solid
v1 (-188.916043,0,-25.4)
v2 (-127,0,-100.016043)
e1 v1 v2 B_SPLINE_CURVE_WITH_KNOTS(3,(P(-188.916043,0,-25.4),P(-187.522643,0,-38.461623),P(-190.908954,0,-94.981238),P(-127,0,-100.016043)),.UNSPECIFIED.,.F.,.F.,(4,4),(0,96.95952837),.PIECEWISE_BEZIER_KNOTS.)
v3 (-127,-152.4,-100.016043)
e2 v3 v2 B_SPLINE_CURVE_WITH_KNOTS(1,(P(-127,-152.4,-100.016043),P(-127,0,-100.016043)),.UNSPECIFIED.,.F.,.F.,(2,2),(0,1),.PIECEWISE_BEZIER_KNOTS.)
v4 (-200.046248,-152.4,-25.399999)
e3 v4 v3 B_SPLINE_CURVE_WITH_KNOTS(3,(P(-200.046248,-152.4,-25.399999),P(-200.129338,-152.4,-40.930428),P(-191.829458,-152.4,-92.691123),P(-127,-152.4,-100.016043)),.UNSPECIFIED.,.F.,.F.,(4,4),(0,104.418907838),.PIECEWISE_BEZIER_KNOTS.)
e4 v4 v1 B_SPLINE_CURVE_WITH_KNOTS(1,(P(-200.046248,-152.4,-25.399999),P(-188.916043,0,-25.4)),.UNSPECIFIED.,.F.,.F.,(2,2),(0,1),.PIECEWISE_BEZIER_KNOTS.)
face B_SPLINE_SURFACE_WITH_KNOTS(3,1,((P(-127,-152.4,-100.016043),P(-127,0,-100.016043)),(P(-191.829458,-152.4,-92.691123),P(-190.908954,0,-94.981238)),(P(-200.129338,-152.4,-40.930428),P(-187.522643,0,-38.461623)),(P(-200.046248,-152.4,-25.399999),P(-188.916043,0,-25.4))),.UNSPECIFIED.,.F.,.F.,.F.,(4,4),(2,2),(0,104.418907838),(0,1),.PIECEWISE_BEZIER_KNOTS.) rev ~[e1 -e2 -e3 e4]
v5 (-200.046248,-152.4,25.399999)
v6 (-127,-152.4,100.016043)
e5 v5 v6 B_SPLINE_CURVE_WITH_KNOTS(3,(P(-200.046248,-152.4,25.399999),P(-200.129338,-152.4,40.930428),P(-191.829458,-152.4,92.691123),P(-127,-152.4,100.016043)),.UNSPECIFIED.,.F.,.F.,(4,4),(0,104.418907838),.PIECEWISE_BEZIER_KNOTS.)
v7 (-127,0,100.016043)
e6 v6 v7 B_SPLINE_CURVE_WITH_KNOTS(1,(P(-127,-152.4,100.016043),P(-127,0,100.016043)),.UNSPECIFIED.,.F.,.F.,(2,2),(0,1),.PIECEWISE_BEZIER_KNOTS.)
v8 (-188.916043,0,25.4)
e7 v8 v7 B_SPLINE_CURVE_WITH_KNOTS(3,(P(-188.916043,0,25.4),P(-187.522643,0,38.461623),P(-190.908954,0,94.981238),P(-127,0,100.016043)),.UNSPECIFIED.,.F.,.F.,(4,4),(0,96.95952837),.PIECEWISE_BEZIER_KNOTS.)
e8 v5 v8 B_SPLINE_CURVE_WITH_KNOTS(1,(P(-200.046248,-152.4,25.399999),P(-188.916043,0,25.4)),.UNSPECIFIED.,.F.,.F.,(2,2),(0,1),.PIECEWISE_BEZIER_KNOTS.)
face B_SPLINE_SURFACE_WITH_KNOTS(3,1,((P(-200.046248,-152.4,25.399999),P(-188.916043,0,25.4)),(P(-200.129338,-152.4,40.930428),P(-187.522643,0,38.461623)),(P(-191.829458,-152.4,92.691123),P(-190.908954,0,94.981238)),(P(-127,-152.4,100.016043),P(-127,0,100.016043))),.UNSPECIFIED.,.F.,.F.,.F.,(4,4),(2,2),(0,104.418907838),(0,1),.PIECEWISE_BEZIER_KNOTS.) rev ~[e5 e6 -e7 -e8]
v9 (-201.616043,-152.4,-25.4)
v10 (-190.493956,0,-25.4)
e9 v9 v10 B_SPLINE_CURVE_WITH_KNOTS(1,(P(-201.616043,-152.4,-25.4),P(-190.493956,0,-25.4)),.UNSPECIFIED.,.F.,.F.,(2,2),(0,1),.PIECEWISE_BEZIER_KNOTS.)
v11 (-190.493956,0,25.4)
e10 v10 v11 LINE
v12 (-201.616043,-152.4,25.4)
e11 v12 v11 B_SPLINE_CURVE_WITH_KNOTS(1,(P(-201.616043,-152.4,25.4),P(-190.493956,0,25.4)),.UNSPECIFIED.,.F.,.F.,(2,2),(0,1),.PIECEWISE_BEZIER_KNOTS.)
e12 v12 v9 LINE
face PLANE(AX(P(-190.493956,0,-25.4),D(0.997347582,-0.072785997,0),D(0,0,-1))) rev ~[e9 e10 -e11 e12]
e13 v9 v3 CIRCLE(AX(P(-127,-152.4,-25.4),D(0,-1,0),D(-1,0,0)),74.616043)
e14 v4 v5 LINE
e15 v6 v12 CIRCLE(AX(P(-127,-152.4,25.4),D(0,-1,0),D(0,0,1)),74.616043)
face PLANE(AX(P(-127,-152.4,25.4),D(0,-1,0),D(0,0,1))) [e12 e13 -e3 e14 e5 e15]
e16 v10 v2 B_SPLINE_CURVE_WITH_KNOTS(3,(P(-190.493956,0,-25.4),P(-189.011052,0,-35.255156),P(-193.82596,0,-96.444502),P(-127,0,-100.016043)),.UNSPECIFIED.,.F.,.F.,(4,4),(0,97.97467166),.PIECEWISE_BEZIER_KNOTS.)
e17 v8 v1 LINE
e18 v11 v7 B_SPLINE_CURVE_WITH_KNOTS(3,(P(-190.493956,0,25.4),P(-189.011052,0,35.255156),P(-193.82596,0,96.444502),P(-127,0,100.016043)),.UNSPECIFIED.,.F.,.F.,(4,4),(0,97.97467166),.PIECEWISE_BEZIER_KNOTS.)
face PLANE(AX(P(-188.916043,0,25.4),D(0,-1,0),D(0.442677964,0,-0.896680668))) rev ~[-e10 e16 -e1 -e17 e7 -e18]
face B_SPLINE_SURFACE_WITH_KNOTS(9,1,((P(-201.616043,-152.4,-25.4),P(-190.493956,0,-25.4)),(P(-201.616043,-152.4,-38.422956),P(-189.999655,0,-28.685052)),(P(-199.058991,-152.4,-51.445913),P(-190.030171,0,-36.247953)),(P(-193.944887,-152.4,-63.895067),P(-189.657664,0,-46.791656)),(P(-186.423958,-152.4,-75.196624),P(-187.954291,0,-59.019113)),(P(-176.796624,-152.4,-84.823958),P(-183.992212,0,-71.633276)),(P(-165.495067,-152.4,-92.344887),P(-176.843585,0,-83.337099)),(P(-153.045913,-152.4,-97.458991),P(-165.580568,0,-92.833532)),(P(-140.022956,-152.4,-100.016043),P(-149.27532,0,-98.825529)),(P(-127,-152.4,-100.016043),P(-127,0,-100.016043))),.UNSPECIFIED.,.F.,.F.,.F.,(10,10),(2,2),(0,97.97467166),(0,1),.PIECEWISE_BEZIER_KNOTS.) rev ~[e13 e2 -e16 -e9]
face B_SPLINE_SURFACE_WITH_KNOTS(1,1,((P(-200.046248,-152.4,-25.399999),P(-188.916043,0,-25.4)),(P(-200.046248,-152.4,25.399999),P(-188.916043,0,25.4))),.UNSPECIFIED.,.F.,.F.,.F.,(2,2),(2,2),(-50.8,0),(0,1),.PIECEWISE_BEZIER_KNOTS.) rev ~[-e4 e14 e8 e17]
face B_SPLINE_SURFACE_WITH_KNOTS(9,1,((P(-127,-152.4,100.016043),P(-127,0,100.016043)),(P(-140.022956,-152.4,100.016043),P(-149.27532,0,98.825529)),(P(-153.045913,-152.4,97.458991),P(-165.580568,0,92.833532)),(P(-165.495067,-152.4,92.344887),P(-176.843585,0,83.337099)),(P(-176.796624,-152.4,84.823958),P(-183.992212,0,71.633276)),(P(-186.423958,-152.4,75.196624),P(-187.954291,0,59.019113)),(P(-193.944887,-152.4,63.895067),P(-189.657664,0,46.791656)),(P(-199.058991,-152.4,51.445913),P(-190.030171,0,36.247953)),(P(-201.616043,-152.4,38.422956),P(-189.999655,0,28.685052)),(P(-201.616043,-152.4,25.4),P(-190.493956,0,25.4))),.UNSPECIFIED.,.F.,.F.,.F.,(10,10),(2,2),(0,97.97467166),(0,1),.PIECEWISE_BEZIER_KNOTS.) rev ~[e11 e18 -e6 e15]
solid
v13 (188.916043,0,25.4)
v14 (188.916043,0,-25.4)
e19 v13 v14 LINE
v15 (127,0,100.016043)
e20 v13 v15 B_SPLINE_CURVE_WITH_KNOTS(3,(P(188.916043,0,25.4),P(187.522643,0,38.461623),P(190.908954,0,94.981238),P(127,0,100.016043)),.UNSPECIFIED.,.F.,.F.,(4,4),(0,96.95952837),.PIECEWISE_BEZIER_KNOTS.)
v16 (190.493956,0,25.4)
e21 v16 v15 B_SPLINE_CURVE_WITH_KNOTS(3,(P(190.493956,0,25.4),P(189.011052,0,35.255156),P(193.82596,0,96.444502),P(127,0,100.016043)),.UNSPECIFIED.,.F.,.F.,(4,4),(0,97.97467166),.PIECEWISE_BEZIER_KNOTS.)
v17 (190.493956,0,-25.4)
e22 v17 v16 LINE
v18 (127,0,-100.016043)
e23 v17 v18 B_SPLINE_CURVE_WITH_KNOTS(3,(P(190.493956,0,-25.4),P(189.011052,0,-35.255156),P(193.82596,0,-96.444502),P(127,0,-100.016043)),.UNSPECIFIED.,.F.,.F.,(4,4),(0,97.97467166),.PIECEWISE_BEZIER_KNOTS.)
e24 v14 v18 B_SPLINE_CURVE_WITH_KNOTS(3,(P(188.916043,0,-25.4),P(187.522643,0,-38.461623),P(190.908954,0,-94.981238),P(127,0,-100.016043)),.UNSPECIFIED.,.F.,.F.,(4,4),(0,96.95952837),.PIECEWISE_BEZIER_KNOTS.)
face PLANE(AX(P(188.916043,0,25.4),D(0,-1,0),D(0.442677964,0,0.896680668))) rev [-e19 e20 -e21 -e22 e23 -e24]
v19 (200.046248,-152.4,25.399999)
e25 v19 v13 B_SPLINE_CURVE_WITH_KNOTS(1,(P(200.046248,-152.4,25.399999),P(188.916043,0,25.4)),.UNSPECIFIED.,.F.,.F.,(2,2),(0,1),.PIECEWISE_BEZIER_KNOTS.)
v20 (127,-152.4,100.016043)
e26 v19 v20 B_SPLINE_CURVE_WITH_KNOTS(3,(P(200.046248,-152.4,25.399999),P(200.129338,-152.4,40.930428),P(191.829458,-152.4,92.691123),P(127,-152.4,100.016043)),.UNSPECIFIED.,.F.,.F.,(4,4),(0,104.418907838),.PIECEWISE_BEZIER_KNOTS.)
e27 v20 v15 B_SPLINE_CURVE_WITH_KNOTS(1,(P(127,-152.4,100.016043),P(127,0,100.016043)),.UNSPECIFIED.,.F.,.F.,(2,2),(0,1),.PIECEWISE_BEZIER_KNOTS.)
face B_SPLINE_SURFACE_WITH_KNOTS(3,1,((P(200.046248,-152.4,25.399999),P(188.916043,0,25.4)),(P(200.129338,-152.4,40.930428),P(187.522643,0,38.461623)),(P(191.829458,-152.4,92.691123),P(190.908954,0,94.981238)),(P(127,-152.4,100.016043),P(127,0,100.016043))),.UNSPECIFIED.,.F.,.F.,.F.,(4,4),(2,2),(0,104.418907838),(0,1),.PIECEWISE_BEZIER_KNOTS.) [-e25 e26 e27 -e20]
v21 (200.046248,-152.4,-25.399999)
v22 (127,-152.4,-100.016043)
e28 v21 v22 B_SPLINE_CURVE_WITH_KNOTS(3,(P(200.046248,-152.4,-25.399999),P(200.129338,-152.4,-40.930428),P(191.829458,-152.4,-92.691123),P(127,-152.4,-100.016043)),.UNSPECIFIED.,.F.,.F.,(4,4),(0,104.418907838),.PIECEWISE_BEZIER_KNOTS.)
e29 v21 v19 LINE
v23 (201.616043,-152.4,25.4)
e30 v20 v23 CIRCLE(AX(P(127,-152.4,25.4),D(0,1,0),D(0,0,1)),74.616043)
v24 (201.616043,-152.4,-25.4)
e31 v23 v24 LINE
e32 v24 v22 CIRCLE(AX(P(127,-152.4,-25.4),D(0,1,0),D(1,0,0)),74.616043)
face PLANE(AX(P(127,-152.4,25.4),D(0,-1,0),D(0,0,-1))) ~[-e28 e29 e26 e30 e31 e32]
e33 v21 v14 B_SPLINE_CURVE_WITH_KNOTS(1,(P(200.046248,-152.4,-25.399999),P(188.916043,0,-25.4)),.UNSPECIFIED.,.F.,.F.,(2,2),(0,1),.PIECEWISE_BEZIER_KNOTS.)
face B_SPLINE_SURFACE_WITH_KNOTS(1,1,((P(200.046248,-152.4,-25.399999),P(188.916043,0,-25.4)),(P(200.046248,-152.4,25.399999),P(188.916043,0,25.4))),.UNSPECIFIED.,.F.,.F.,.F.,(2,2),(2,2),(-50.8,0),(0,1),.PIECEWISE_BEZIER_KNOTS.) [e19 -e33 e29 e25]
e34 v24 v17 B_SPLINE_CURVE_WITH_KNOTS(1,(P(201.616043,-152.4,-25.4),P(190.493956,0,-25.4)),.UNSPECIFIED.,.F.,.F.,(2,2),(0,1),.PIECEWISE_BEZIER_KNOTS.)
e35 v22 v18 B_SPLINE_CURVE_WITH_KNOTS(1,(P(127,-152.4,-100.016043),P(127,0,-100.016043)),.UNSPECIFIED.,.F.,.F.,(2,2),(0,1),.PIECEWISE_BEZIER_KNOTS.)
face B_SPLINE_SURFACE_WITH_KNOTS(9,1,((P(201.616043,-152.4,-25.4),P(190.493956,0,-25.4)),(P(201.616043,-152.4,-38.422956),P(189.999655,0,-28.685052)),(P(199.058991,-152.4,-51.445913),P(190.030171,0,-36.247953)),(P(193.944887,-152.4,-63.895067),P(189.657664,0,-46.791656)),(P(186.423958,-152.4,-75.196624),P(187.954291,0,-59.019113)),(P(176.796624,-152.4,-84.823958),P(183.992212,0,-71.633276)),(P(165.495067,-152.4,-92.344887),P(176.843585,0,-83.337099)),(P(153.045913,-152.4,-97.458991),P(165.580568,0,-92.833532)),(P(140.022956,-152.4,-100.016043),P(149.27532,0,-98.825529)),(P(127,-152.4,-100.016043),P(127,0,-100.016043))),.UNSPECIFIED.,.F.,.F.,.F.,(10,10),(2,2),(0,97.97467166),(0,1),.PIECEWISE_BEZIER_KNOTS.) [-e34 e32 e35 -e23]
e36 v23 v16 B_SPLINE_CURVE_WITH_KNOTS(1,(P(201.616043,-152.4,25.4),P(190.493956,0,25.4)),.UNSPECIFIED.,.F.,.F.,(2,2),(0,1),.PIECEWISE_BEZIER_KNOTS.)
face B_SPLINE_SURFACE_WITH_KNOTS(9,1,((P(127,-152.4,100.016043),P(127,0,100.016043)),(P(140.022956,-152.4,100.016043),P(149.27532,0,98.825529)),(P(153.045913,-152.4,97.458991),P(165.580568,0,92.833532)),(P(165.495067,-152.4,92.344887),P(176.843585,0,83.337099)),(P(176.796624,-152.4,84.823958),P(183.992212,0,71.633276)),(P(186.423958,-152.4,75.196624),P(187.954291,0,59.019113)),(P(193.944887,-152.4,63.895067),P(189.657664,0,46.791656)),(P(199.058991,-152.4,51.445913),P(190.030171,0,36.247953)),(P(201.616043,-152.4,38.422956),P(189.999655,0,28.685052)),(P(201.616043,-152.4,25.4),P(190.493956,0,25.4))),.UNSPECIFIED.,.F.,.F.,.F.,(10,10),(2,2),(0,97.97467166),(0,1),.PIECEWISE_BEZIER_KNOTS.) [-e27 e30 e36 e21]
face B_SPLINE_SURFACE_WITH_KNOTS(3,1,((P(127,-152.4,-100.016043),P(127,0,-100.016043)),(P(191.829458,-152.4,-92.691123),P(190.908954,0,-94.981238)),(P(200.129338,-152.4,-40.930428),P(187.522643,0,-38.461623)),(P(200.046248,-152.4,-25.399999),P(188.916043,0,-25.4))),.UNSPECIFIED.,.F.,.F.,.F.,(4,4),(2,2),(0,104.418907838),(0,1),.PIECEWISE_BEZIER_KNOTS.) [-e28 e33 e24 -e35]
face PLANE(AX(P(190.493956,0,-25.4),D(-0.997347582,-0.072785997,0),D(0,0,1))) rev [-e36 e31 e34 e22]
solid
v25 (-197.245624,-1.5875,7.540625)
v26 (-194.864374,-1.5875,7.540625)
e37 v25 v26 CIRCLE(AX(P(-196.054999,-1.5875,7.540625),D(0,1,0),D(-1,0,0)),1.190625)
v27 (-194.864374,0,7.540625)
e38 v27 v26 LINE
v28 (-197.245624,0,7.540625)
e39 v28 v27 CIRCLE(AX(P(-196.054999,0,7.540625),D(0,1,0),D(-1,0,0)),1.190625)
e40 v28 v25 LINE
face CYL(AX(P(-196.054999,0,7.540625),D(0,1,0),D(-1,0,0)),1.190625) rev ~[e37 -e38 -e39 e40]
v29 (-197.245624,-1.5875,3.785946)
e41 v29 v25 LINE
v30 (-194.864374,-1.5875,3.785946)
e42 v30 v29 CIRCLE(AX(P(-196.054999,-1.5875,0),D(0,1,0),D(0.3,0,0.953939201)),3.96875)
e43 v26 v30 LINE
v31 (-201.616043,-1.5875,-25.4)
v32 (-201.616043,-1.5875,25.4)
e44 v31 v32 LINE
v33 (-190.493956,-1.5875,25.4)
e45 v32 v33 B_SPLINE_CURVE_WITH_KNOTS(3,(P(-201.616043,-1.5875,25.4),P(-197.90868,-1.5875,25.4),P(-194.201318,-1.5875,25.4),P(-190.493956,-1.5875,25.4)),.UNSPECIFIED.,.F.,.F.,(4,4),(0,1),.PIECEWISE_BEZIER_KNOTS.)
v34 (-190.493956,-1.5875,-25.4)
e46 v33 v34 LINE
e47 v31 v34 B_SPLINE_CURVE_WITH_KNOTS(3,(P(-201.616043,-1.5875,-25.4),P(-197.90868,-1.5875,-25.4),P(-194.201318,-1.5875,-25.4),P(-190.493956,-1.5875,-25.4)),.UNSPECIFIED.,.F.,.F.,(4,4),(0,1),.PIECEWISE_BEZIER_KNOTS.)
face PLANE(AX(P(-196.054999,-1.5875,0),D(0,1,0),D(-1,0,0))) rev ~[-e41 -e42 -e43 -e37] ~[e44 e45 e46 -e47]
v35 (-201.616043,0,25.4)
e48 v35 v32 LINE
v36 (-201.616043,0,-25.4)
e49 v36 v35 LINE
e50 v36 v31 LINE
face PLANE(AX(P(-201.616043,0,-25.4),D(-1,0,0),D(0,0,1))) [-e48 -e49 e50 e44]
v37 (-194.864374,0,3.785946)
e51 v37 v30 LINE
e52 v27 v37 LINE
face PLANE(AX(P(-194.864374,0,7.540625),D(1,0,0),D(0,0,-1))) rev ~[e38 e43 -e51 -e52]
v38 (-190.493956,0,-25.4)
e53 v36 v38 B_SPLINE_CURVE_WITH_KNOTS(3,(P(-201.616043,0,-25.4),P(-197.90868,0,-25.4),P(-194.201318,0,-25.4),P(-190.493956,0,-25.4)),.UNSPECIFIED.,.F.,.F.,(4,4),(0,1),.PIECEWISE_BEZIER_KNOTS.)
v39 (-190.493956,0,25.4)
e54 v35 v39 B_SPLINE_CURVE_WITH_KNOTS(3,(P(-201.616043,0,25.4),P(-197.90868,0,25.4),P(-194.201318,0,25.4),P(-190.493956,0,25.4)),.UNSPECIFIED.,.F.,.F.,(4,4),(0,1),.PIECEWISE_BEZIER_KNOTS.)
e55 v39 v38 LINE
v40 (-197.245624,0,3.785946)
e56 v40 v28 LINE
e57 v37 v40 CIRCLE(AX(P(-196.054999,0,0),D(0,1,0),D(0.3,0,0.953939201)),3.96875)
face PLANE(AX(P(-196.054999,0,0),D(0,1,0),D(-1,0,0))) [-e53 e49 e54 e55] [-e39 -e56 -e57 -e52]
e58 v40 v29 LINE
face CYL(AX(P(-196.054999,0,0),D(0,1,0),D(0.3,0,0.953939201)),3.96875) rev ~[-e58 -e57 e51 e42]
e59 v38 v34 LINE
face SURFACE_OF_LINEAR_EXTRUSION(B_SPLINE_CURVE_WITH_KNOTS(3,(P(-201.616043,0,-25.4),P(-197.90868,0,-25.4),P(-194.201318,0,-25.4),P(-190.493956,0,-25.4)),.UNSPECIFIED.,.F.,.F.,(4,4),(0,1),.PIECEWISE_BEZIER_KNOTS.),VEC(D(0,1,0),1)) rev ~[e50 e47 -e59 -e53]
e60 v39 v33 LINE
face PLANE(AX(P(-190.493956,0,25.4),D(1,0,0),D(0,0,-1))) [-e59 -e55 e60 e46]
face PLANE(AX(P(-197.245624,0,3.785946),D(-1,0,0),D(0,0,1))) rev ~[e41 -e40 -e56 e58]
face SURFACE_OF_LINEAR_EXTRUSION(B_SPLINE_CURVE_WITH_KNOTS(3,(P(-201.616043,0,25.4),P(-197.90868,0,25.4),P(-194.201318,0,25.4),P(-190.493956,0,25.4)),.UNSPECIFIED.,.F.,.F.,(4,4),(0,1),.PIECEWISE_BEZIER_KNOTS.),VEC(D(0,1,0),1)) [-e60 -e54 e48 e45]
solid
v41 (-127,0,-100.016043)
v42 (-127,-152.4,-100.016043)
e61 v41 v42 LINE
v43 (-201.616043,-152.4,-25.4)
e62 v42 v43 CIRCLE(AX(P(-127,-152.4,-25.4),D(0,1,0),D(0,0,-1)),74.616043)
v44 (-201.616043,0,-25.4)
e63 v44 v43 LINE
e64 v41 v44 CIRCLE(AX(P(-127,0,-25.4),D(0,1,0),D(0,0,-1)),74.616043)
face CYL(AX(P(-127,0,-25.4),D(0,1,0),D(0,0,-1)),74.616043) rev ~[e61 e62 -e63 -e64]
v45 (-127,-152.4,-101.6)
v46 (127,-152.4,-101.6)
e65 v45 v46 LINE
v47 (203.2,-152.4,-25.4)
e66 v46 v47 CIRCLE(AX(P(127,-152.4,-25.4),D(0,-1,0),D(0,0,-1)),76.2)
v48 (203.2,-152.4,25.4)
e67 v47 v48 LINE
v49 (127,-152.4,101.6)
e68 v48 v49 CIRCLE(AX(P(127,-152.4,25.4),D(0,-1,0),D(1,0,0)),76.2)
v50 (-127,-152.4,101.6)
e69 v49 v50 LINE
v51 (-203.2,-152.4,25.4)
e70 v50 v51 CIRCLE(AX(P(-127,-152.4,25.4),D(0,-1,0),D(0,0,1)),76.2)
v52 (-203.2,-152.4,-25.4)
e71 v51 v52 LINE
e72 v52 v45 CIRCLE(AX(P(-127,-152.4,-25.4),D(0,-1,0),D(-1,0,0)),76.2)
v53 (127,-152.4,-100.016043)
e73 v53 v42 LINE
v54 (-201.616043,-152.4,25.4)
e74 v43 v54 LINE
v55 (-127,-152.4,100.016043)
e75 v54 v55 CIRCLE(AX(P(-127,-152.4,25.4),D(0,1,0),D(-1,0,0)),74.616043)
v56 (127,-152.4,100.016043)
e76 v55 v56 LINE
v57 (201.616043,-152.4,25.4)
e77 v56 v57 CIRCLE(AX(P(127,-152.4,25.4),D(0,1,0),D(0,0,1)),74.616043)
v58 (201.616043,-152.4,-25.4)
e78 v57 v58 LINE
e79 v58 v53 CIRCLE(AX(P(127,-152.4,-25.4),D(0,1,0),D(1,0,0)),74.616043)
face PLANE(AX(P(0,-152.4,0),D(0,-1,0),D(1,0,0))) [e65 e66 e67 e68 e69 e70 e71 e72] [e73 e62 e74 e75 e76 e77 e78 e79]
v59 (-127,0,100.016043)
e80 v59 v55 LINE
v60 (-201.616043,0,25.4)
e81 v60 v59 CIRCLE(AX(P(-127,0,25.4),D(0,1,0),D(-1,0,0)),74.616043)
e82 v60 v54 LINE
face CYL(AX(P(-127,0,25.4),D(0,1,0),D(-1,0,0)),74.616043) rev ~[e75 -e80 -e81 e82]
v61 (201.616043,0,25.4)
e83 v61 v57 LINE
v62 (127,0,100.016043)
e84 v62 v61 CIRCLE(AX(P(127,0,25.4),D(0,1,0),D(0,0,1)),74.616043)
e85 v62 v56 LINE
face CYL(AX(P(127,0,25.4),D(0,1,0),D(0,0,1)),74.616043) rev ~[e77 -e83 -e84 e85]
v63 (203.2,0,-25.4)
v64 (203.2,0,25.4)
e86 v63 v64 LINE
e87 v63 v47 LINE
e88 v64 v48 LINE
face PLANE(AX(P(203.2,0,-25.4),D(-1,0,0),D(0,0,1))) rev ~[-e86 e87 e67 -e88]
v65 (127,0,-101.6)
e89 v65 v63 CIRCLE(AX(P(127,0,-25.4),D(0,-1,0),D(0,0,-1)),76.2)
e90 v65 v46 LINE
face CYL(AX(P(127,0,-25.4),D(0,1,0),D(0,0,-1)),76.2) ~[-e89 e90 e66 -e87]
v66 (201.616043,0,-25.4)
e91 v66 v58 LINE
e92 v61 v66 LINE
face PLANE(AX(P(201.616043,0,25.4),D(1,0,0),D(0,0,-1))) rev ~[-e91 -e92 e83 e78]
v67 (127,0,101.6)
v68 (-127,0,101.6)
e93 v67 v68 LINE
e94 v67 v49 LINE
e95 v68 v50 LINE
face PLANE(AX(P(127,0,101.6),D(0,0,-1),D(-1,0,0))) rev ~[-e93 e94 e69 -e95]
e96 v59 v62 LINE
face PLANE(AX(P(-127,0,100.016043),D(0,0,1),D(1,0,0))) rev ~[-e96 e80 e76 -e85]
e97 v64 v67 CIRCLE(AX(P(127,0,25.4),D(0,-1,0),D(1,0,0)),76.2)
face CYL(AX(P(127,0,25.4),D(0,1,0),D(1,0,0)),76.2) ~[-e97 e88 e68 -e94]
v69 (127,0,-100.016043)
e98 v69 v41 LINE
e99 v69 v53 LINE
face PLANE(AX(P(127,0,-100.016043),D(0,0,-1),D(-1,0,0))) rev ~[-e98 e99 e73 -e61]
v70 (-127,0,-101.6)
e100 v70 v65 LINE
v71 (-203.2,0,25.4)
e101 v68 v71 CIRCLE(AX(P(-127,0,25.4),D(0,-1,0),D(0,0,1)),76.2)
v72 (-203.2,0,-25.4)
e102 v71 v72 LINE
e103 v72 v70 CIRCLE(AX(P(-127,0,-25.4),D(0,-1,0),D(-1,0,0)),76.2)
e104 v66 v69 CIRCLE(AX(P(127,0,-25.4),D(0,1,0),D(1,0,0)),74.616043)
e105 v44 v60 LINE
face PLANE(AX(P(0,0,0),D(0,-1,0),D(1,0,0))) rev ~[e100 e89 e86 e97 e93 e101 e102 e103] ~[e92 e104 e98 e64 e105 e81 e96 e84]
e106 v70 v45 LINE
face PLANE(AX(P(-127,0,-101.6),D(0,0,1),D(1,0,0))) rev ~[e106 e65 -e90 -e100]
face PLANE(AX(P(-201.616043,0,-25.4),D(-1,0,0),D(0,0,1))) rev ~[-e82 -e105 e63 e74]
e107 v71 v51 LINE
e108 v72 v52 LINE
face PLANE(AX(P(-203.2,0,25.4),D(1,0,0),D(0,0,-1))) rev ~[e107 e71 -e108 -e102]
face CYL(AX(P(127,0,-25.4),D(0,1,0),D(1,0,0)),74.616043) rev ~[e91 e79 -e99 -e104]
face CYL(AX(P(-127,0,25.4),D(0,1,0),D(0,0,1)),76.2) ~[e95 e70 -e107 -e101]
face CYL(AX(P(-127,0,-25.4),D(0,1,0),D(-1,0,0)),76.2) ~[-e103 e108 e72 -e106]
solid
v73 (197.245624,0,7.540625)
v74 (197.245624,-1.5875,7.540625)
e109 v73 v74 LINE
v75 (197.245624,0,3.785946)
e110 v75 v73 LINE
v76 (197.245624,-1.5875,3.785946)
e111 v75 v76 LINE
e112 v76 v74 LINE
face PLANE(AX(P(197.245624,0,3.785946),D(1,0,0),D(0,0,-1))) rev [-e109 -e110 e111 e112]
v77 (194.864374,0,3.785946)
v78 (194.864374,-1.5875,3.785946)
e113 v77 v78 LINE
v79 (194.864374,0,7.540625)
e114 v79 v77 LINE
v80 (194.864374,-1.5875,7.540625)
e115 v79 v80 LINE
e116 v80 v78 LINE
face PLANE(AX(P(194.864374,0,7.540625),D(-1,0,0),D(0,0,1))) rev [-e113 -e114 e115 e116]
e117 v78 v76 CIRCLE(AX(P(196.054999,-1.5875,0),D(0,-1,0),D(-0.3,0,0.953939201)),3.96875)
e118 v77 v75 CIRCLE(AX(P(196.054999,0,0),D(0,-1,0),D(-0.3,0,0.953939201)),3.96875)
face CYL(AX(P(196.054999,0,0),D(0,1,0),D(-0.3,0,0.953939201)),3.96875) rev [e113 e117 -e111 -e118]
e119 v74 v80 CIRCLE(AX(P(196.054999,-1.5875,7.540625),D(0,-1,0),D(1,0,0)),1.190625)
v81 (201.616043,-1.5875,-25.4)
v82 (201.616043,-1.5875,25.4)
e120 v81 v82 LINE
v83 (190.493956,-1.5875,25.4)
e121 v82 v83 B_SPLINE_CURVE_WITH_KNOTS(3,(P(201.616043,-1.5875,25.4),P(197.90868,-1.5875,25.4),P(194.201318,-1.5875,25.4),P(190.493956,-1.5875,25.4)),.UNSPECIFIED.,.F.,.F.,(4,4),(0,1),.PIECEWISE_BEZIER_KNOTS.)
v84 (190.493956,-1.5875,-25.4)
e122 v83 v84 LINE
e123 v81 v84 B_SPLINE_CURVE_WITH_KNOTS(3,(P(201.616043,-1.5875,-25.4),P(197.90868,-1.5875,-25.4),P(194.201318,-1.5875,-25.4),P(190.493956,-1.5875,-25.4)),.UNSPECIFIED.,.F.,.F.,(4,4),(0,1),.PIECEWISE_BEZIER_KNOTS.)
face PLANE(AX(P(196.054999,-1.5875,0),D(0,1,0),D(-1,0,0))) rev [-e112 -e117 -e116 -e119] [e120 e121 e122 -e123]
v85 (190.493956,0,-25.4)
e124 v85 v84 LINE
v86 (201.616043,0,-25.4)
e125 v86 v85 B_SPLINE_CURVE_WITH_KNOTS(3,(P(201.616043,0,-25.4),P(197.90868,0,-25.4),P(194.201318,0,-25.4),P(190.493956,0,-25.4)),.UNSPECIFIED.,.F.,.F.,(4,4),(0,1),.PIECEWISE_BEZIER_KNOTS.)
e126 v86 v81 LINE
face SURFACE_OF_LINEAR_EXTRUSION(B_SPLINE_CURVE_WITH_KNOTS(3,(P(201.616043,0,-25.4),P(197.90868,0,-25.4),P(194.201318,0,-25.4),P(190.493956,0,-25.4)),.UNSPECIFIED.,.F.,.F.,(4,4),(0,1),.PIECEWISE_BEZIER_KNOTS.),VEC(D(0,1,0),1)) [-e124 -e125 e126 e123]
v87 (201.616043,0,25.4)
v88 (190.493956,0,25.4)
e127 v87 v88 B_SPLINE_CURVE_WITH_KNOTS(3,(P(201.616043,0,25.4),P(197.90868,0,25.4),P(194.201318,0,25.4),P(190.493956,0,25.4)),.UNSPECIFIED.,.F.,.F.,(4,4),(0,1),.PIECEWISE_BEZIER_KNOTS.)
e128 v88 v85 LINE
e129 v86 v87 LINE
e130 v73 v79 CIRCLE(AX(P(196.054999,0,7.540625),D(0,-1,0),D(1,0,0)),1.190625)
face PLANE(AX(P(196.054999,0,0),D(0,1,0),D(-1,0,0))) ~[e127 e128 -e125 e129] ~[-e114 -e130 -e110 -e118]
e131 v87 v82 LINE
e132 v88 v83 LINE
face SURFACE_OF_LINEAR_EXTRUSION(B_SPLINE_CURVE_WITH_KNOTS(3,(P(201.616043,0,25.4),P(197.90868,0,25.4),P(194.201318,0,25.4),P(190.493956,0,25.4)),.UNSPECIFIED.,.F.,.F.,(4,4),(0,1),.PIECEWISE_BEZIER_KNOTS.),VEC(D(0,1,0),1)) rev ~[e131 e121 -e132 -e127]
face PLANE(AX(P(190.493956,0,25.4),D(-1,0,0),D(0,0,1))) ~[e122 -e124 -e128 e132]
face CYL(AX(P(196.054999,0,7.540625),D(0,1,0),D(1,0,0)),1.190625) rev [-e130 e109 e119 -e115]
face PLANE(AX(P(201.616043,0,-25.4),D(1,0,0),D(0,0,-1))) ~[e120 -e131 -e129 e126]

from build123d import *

# Parameters (mm, degrees)
F1_DEPTH = 152.4
F7_DEPTH = 1.5875
F9_DEPTH = 1.6002


# Not quite as in the source:
# - ends of sketch curves that miss each other by under 0.0002 mm in the source are joined


with BuildPart() as f1:
    # F0 (on Front) → F1 (new body)
    with BuildSketch(Plane.XZ):
        with BuildLine():
            Line((-127, -101.6), (127, -101.6))
            ThreePointArc((127, -101.6), (180.8815367264, -79.2815367264), (203.2, -25.4))
            Line((203.2, -25.4), (203.2, 25.4))
            ThreePointArc((203.2, 25.4), (180.8815367264, 79.2815367264), (127, 101.6))
            Line((127, 101.6), (-127, 101.6))
            ThreePointArc((-127, 101.6), (-180.8815367264, 79.2815367264), (-203.2, 25.4))
            Line((-203.2, 25.4), (-203.2, -25.4))
            ThreePointArc((-203.2, -25.4), (-180.8815367264, -79.2815367264), (-127, -101.6))
        make_face()
        with BuildLine():
            ThreePointArc((127, 100.0160425901), (179.7615097008, 78.1615097008), (201.6160425901, 25.4))
            Line((201.6160425901, 25.4), (201.6160425901, -25.4))
            ThreePointArc((201.6160425901, -25.4), (179.7615097008, -78.1615097008), (127, -100.0160425901))
            Line((127, -100.0160425901), (-127, -100.0160425901))
            ThreePointArc((-127, -100.0160425901), (-179.7615097008, -78.1615097008), (-201.6160425901, -25.4))
            Line((-201.6160425901, -25.4), (-201.6160425901, 25.4))
            ThreePointArc((-201.6160425901, 25.4), (-179.7615097008, 78.1615097008), (-127, 100.0160425901))
            Line((-127, 100.0160425901), (127, 100.0160425901))
        make_face(mode=Mode.SUBTRACT)
    extrude(amount=F1_DEPTH)


with BuildPart() as f4:
    # F2 (on face) → F4 section 0
    with BuildSketch(Plane.XZ.offset(152.4)):
        with BuildLine():
            add(Edge.make_bspline(
                [(-200.0462481144, 25.3999990709), (-200.1293383282, 40.9304278155), (-191.8294578791, 92.6911234856), (-127, 100.0160425901)],
                knots=[0, 0, 0, 0, 104.4189078379, 104.4189078379, 104.4189078379, 104.4189078379], degree=3))
            ThreePointArc((-127, 100.0160425901), (-179.7615097008, 78.1615097008), (-201.6160425901, 25.4))
            Line((-201.6160425901, 25.4), (-201.6160425901, -25.4))
            ThreePointArc((-201.6160425901, -25.4), (-179.7615097008, -78.1615097008), (-127, -100.0160425901))
            add(Edge.make_bspline(
                [(-200.0462481144, -25.3999990709), (-200.1293383282, -40.9304278155), (-191.8294578791, -92.6911234856), (-127, -100.0160425901)],
                knots=[0, 0, 0, 0, 104.4189078379, 104.4189078379, 104.4189078379, 104.4189078379], degree=3))
            Line((-200.0462481144, -25.3999990709), (-200.0462481144, 25.3999990709))
        make_face()
    # F3 (on face) → F4 section 1
    with BuildSketch(Plane(origin=(0, 0, 0), x_dir=(-1, 0, 0), z_dir=(0, 1, 0))):
        with BuildLine():
            Line((188.9160425901, 25.4), (188.9160425901, -25.4))
            add(Edge.make_bspline(
                [(188.9160425901, -25.4), (187.5226431005, -38.4616232589), (190.9089535475, -94.981238246), (127, -100.0160425901)],
                knots=[0, 0, 0, 0, 96.9595283705, 96.9595283705, 96.9595283705, 96.9595283705], degree=3))
            add(Edge.make_bspline(
                [(190.4939562082, -25.4), (189.0110522509, -35.2551564574), (193.8259601593, -96.4445024729), (127, -100.0160425901)],
                knots=[0, 0, 0, 0, 97.9746716595, 97.9746716595, 97.9746716595, 97.9746716595], degree=3))
            Line((190.4939562082, -25.4), (190.4939562082, 25.4))
            add(Edge.make_bspline(
                [(190.4939562082, 25.4), (189.0110522509, 35.2551564574), (193.8259601593, 96.4445024729), (127, 100.0160425901)],
                knots=[0, 0, 0, 0, 97.9746716595, 97.9746716595, 97.9746716595, 97.9746716595], degree=3))
            add(Edge.make_bspline(
                [(188.9160425901, 25.4), (187.5226431005, 38.4616232589), (190.9089535475, 94.981238246), (127, 100.0160425901)],
                knots=[0, 0, 0, 0, 96.9595283705, 96.9595283705, 96.9595283705, 96.9595283705], degree=3))
        make_face()
    loft()


with BuildPart() as f7:
    # F6 (on face) → F7 (new body)
    with BuildSketch(Plane(origin=(0, 0, 0), x_dir=(-1, 0, 0), z_dir=(0, 1, 0))):
        with BuildLine():
            Line((190.4939562082, 25.4), (190.4939562082, -25.4))
            add(Edge.make_bspline(
                [(201.6160425901, -25.4), (197.9086804628, -25.4), (194.2013183355, -25.4), (190.4939562082, -25.4)],
                knots=[0, 0, 0, 0, 1, 1, 1, 1], degree=3))
            Line((201.6160425901, -25.4), (201.6160425901, 25.4))
            add(Edge.make_bspline(
                [(201.6160425901, 25.4), (197.9086804628, 25.4), (194.2013183355, 25.4), (190.4939562082, 25.4)],
                knots=[0, 0, 0, 0, 1, 1, 1, 1], degree=3))
        make_face()
    extrude(amount=-F7_DEPTH)

    # F8 (on face) → F9 (cut)
    with BuildSketch(Plane(origin=(0, 0, 0), x_dir=(-1, 0, 0), z_dir=(0, 1, 0))):
        with BuildLine():
            Line((194.8643743992, 7.540625), (194.8643743992, 3.7859462056))
            ThreePointArc((194.8643743992, 3.7859462056), (196.0549993992, -3.96875), (197.2456243992, 3.7859462056))
            Line((197.2456243992, 3.7859462056), (197.2456243992, 7.540625))
            ThreePointArc((197.2456243992, 7.540625), (196.0549993992, 8.73125), (194.8643743992, 7.540625))
        make_face()
    extrude(amount=-F9_DEPTH, mode=Mode.SUBTRACT)


with BuildPart() as f10_1:
    # F10: instance of F7
    add(f7.part.mirror(Plane.YZ))


with BuildPart() as f10_2:
    # F10: instance of F4
    add(f4.part.mirror(Plane.YZ))


solid = Compound([f1.part, f4.part, f7.part, f10_1.part, f10_2.part])
